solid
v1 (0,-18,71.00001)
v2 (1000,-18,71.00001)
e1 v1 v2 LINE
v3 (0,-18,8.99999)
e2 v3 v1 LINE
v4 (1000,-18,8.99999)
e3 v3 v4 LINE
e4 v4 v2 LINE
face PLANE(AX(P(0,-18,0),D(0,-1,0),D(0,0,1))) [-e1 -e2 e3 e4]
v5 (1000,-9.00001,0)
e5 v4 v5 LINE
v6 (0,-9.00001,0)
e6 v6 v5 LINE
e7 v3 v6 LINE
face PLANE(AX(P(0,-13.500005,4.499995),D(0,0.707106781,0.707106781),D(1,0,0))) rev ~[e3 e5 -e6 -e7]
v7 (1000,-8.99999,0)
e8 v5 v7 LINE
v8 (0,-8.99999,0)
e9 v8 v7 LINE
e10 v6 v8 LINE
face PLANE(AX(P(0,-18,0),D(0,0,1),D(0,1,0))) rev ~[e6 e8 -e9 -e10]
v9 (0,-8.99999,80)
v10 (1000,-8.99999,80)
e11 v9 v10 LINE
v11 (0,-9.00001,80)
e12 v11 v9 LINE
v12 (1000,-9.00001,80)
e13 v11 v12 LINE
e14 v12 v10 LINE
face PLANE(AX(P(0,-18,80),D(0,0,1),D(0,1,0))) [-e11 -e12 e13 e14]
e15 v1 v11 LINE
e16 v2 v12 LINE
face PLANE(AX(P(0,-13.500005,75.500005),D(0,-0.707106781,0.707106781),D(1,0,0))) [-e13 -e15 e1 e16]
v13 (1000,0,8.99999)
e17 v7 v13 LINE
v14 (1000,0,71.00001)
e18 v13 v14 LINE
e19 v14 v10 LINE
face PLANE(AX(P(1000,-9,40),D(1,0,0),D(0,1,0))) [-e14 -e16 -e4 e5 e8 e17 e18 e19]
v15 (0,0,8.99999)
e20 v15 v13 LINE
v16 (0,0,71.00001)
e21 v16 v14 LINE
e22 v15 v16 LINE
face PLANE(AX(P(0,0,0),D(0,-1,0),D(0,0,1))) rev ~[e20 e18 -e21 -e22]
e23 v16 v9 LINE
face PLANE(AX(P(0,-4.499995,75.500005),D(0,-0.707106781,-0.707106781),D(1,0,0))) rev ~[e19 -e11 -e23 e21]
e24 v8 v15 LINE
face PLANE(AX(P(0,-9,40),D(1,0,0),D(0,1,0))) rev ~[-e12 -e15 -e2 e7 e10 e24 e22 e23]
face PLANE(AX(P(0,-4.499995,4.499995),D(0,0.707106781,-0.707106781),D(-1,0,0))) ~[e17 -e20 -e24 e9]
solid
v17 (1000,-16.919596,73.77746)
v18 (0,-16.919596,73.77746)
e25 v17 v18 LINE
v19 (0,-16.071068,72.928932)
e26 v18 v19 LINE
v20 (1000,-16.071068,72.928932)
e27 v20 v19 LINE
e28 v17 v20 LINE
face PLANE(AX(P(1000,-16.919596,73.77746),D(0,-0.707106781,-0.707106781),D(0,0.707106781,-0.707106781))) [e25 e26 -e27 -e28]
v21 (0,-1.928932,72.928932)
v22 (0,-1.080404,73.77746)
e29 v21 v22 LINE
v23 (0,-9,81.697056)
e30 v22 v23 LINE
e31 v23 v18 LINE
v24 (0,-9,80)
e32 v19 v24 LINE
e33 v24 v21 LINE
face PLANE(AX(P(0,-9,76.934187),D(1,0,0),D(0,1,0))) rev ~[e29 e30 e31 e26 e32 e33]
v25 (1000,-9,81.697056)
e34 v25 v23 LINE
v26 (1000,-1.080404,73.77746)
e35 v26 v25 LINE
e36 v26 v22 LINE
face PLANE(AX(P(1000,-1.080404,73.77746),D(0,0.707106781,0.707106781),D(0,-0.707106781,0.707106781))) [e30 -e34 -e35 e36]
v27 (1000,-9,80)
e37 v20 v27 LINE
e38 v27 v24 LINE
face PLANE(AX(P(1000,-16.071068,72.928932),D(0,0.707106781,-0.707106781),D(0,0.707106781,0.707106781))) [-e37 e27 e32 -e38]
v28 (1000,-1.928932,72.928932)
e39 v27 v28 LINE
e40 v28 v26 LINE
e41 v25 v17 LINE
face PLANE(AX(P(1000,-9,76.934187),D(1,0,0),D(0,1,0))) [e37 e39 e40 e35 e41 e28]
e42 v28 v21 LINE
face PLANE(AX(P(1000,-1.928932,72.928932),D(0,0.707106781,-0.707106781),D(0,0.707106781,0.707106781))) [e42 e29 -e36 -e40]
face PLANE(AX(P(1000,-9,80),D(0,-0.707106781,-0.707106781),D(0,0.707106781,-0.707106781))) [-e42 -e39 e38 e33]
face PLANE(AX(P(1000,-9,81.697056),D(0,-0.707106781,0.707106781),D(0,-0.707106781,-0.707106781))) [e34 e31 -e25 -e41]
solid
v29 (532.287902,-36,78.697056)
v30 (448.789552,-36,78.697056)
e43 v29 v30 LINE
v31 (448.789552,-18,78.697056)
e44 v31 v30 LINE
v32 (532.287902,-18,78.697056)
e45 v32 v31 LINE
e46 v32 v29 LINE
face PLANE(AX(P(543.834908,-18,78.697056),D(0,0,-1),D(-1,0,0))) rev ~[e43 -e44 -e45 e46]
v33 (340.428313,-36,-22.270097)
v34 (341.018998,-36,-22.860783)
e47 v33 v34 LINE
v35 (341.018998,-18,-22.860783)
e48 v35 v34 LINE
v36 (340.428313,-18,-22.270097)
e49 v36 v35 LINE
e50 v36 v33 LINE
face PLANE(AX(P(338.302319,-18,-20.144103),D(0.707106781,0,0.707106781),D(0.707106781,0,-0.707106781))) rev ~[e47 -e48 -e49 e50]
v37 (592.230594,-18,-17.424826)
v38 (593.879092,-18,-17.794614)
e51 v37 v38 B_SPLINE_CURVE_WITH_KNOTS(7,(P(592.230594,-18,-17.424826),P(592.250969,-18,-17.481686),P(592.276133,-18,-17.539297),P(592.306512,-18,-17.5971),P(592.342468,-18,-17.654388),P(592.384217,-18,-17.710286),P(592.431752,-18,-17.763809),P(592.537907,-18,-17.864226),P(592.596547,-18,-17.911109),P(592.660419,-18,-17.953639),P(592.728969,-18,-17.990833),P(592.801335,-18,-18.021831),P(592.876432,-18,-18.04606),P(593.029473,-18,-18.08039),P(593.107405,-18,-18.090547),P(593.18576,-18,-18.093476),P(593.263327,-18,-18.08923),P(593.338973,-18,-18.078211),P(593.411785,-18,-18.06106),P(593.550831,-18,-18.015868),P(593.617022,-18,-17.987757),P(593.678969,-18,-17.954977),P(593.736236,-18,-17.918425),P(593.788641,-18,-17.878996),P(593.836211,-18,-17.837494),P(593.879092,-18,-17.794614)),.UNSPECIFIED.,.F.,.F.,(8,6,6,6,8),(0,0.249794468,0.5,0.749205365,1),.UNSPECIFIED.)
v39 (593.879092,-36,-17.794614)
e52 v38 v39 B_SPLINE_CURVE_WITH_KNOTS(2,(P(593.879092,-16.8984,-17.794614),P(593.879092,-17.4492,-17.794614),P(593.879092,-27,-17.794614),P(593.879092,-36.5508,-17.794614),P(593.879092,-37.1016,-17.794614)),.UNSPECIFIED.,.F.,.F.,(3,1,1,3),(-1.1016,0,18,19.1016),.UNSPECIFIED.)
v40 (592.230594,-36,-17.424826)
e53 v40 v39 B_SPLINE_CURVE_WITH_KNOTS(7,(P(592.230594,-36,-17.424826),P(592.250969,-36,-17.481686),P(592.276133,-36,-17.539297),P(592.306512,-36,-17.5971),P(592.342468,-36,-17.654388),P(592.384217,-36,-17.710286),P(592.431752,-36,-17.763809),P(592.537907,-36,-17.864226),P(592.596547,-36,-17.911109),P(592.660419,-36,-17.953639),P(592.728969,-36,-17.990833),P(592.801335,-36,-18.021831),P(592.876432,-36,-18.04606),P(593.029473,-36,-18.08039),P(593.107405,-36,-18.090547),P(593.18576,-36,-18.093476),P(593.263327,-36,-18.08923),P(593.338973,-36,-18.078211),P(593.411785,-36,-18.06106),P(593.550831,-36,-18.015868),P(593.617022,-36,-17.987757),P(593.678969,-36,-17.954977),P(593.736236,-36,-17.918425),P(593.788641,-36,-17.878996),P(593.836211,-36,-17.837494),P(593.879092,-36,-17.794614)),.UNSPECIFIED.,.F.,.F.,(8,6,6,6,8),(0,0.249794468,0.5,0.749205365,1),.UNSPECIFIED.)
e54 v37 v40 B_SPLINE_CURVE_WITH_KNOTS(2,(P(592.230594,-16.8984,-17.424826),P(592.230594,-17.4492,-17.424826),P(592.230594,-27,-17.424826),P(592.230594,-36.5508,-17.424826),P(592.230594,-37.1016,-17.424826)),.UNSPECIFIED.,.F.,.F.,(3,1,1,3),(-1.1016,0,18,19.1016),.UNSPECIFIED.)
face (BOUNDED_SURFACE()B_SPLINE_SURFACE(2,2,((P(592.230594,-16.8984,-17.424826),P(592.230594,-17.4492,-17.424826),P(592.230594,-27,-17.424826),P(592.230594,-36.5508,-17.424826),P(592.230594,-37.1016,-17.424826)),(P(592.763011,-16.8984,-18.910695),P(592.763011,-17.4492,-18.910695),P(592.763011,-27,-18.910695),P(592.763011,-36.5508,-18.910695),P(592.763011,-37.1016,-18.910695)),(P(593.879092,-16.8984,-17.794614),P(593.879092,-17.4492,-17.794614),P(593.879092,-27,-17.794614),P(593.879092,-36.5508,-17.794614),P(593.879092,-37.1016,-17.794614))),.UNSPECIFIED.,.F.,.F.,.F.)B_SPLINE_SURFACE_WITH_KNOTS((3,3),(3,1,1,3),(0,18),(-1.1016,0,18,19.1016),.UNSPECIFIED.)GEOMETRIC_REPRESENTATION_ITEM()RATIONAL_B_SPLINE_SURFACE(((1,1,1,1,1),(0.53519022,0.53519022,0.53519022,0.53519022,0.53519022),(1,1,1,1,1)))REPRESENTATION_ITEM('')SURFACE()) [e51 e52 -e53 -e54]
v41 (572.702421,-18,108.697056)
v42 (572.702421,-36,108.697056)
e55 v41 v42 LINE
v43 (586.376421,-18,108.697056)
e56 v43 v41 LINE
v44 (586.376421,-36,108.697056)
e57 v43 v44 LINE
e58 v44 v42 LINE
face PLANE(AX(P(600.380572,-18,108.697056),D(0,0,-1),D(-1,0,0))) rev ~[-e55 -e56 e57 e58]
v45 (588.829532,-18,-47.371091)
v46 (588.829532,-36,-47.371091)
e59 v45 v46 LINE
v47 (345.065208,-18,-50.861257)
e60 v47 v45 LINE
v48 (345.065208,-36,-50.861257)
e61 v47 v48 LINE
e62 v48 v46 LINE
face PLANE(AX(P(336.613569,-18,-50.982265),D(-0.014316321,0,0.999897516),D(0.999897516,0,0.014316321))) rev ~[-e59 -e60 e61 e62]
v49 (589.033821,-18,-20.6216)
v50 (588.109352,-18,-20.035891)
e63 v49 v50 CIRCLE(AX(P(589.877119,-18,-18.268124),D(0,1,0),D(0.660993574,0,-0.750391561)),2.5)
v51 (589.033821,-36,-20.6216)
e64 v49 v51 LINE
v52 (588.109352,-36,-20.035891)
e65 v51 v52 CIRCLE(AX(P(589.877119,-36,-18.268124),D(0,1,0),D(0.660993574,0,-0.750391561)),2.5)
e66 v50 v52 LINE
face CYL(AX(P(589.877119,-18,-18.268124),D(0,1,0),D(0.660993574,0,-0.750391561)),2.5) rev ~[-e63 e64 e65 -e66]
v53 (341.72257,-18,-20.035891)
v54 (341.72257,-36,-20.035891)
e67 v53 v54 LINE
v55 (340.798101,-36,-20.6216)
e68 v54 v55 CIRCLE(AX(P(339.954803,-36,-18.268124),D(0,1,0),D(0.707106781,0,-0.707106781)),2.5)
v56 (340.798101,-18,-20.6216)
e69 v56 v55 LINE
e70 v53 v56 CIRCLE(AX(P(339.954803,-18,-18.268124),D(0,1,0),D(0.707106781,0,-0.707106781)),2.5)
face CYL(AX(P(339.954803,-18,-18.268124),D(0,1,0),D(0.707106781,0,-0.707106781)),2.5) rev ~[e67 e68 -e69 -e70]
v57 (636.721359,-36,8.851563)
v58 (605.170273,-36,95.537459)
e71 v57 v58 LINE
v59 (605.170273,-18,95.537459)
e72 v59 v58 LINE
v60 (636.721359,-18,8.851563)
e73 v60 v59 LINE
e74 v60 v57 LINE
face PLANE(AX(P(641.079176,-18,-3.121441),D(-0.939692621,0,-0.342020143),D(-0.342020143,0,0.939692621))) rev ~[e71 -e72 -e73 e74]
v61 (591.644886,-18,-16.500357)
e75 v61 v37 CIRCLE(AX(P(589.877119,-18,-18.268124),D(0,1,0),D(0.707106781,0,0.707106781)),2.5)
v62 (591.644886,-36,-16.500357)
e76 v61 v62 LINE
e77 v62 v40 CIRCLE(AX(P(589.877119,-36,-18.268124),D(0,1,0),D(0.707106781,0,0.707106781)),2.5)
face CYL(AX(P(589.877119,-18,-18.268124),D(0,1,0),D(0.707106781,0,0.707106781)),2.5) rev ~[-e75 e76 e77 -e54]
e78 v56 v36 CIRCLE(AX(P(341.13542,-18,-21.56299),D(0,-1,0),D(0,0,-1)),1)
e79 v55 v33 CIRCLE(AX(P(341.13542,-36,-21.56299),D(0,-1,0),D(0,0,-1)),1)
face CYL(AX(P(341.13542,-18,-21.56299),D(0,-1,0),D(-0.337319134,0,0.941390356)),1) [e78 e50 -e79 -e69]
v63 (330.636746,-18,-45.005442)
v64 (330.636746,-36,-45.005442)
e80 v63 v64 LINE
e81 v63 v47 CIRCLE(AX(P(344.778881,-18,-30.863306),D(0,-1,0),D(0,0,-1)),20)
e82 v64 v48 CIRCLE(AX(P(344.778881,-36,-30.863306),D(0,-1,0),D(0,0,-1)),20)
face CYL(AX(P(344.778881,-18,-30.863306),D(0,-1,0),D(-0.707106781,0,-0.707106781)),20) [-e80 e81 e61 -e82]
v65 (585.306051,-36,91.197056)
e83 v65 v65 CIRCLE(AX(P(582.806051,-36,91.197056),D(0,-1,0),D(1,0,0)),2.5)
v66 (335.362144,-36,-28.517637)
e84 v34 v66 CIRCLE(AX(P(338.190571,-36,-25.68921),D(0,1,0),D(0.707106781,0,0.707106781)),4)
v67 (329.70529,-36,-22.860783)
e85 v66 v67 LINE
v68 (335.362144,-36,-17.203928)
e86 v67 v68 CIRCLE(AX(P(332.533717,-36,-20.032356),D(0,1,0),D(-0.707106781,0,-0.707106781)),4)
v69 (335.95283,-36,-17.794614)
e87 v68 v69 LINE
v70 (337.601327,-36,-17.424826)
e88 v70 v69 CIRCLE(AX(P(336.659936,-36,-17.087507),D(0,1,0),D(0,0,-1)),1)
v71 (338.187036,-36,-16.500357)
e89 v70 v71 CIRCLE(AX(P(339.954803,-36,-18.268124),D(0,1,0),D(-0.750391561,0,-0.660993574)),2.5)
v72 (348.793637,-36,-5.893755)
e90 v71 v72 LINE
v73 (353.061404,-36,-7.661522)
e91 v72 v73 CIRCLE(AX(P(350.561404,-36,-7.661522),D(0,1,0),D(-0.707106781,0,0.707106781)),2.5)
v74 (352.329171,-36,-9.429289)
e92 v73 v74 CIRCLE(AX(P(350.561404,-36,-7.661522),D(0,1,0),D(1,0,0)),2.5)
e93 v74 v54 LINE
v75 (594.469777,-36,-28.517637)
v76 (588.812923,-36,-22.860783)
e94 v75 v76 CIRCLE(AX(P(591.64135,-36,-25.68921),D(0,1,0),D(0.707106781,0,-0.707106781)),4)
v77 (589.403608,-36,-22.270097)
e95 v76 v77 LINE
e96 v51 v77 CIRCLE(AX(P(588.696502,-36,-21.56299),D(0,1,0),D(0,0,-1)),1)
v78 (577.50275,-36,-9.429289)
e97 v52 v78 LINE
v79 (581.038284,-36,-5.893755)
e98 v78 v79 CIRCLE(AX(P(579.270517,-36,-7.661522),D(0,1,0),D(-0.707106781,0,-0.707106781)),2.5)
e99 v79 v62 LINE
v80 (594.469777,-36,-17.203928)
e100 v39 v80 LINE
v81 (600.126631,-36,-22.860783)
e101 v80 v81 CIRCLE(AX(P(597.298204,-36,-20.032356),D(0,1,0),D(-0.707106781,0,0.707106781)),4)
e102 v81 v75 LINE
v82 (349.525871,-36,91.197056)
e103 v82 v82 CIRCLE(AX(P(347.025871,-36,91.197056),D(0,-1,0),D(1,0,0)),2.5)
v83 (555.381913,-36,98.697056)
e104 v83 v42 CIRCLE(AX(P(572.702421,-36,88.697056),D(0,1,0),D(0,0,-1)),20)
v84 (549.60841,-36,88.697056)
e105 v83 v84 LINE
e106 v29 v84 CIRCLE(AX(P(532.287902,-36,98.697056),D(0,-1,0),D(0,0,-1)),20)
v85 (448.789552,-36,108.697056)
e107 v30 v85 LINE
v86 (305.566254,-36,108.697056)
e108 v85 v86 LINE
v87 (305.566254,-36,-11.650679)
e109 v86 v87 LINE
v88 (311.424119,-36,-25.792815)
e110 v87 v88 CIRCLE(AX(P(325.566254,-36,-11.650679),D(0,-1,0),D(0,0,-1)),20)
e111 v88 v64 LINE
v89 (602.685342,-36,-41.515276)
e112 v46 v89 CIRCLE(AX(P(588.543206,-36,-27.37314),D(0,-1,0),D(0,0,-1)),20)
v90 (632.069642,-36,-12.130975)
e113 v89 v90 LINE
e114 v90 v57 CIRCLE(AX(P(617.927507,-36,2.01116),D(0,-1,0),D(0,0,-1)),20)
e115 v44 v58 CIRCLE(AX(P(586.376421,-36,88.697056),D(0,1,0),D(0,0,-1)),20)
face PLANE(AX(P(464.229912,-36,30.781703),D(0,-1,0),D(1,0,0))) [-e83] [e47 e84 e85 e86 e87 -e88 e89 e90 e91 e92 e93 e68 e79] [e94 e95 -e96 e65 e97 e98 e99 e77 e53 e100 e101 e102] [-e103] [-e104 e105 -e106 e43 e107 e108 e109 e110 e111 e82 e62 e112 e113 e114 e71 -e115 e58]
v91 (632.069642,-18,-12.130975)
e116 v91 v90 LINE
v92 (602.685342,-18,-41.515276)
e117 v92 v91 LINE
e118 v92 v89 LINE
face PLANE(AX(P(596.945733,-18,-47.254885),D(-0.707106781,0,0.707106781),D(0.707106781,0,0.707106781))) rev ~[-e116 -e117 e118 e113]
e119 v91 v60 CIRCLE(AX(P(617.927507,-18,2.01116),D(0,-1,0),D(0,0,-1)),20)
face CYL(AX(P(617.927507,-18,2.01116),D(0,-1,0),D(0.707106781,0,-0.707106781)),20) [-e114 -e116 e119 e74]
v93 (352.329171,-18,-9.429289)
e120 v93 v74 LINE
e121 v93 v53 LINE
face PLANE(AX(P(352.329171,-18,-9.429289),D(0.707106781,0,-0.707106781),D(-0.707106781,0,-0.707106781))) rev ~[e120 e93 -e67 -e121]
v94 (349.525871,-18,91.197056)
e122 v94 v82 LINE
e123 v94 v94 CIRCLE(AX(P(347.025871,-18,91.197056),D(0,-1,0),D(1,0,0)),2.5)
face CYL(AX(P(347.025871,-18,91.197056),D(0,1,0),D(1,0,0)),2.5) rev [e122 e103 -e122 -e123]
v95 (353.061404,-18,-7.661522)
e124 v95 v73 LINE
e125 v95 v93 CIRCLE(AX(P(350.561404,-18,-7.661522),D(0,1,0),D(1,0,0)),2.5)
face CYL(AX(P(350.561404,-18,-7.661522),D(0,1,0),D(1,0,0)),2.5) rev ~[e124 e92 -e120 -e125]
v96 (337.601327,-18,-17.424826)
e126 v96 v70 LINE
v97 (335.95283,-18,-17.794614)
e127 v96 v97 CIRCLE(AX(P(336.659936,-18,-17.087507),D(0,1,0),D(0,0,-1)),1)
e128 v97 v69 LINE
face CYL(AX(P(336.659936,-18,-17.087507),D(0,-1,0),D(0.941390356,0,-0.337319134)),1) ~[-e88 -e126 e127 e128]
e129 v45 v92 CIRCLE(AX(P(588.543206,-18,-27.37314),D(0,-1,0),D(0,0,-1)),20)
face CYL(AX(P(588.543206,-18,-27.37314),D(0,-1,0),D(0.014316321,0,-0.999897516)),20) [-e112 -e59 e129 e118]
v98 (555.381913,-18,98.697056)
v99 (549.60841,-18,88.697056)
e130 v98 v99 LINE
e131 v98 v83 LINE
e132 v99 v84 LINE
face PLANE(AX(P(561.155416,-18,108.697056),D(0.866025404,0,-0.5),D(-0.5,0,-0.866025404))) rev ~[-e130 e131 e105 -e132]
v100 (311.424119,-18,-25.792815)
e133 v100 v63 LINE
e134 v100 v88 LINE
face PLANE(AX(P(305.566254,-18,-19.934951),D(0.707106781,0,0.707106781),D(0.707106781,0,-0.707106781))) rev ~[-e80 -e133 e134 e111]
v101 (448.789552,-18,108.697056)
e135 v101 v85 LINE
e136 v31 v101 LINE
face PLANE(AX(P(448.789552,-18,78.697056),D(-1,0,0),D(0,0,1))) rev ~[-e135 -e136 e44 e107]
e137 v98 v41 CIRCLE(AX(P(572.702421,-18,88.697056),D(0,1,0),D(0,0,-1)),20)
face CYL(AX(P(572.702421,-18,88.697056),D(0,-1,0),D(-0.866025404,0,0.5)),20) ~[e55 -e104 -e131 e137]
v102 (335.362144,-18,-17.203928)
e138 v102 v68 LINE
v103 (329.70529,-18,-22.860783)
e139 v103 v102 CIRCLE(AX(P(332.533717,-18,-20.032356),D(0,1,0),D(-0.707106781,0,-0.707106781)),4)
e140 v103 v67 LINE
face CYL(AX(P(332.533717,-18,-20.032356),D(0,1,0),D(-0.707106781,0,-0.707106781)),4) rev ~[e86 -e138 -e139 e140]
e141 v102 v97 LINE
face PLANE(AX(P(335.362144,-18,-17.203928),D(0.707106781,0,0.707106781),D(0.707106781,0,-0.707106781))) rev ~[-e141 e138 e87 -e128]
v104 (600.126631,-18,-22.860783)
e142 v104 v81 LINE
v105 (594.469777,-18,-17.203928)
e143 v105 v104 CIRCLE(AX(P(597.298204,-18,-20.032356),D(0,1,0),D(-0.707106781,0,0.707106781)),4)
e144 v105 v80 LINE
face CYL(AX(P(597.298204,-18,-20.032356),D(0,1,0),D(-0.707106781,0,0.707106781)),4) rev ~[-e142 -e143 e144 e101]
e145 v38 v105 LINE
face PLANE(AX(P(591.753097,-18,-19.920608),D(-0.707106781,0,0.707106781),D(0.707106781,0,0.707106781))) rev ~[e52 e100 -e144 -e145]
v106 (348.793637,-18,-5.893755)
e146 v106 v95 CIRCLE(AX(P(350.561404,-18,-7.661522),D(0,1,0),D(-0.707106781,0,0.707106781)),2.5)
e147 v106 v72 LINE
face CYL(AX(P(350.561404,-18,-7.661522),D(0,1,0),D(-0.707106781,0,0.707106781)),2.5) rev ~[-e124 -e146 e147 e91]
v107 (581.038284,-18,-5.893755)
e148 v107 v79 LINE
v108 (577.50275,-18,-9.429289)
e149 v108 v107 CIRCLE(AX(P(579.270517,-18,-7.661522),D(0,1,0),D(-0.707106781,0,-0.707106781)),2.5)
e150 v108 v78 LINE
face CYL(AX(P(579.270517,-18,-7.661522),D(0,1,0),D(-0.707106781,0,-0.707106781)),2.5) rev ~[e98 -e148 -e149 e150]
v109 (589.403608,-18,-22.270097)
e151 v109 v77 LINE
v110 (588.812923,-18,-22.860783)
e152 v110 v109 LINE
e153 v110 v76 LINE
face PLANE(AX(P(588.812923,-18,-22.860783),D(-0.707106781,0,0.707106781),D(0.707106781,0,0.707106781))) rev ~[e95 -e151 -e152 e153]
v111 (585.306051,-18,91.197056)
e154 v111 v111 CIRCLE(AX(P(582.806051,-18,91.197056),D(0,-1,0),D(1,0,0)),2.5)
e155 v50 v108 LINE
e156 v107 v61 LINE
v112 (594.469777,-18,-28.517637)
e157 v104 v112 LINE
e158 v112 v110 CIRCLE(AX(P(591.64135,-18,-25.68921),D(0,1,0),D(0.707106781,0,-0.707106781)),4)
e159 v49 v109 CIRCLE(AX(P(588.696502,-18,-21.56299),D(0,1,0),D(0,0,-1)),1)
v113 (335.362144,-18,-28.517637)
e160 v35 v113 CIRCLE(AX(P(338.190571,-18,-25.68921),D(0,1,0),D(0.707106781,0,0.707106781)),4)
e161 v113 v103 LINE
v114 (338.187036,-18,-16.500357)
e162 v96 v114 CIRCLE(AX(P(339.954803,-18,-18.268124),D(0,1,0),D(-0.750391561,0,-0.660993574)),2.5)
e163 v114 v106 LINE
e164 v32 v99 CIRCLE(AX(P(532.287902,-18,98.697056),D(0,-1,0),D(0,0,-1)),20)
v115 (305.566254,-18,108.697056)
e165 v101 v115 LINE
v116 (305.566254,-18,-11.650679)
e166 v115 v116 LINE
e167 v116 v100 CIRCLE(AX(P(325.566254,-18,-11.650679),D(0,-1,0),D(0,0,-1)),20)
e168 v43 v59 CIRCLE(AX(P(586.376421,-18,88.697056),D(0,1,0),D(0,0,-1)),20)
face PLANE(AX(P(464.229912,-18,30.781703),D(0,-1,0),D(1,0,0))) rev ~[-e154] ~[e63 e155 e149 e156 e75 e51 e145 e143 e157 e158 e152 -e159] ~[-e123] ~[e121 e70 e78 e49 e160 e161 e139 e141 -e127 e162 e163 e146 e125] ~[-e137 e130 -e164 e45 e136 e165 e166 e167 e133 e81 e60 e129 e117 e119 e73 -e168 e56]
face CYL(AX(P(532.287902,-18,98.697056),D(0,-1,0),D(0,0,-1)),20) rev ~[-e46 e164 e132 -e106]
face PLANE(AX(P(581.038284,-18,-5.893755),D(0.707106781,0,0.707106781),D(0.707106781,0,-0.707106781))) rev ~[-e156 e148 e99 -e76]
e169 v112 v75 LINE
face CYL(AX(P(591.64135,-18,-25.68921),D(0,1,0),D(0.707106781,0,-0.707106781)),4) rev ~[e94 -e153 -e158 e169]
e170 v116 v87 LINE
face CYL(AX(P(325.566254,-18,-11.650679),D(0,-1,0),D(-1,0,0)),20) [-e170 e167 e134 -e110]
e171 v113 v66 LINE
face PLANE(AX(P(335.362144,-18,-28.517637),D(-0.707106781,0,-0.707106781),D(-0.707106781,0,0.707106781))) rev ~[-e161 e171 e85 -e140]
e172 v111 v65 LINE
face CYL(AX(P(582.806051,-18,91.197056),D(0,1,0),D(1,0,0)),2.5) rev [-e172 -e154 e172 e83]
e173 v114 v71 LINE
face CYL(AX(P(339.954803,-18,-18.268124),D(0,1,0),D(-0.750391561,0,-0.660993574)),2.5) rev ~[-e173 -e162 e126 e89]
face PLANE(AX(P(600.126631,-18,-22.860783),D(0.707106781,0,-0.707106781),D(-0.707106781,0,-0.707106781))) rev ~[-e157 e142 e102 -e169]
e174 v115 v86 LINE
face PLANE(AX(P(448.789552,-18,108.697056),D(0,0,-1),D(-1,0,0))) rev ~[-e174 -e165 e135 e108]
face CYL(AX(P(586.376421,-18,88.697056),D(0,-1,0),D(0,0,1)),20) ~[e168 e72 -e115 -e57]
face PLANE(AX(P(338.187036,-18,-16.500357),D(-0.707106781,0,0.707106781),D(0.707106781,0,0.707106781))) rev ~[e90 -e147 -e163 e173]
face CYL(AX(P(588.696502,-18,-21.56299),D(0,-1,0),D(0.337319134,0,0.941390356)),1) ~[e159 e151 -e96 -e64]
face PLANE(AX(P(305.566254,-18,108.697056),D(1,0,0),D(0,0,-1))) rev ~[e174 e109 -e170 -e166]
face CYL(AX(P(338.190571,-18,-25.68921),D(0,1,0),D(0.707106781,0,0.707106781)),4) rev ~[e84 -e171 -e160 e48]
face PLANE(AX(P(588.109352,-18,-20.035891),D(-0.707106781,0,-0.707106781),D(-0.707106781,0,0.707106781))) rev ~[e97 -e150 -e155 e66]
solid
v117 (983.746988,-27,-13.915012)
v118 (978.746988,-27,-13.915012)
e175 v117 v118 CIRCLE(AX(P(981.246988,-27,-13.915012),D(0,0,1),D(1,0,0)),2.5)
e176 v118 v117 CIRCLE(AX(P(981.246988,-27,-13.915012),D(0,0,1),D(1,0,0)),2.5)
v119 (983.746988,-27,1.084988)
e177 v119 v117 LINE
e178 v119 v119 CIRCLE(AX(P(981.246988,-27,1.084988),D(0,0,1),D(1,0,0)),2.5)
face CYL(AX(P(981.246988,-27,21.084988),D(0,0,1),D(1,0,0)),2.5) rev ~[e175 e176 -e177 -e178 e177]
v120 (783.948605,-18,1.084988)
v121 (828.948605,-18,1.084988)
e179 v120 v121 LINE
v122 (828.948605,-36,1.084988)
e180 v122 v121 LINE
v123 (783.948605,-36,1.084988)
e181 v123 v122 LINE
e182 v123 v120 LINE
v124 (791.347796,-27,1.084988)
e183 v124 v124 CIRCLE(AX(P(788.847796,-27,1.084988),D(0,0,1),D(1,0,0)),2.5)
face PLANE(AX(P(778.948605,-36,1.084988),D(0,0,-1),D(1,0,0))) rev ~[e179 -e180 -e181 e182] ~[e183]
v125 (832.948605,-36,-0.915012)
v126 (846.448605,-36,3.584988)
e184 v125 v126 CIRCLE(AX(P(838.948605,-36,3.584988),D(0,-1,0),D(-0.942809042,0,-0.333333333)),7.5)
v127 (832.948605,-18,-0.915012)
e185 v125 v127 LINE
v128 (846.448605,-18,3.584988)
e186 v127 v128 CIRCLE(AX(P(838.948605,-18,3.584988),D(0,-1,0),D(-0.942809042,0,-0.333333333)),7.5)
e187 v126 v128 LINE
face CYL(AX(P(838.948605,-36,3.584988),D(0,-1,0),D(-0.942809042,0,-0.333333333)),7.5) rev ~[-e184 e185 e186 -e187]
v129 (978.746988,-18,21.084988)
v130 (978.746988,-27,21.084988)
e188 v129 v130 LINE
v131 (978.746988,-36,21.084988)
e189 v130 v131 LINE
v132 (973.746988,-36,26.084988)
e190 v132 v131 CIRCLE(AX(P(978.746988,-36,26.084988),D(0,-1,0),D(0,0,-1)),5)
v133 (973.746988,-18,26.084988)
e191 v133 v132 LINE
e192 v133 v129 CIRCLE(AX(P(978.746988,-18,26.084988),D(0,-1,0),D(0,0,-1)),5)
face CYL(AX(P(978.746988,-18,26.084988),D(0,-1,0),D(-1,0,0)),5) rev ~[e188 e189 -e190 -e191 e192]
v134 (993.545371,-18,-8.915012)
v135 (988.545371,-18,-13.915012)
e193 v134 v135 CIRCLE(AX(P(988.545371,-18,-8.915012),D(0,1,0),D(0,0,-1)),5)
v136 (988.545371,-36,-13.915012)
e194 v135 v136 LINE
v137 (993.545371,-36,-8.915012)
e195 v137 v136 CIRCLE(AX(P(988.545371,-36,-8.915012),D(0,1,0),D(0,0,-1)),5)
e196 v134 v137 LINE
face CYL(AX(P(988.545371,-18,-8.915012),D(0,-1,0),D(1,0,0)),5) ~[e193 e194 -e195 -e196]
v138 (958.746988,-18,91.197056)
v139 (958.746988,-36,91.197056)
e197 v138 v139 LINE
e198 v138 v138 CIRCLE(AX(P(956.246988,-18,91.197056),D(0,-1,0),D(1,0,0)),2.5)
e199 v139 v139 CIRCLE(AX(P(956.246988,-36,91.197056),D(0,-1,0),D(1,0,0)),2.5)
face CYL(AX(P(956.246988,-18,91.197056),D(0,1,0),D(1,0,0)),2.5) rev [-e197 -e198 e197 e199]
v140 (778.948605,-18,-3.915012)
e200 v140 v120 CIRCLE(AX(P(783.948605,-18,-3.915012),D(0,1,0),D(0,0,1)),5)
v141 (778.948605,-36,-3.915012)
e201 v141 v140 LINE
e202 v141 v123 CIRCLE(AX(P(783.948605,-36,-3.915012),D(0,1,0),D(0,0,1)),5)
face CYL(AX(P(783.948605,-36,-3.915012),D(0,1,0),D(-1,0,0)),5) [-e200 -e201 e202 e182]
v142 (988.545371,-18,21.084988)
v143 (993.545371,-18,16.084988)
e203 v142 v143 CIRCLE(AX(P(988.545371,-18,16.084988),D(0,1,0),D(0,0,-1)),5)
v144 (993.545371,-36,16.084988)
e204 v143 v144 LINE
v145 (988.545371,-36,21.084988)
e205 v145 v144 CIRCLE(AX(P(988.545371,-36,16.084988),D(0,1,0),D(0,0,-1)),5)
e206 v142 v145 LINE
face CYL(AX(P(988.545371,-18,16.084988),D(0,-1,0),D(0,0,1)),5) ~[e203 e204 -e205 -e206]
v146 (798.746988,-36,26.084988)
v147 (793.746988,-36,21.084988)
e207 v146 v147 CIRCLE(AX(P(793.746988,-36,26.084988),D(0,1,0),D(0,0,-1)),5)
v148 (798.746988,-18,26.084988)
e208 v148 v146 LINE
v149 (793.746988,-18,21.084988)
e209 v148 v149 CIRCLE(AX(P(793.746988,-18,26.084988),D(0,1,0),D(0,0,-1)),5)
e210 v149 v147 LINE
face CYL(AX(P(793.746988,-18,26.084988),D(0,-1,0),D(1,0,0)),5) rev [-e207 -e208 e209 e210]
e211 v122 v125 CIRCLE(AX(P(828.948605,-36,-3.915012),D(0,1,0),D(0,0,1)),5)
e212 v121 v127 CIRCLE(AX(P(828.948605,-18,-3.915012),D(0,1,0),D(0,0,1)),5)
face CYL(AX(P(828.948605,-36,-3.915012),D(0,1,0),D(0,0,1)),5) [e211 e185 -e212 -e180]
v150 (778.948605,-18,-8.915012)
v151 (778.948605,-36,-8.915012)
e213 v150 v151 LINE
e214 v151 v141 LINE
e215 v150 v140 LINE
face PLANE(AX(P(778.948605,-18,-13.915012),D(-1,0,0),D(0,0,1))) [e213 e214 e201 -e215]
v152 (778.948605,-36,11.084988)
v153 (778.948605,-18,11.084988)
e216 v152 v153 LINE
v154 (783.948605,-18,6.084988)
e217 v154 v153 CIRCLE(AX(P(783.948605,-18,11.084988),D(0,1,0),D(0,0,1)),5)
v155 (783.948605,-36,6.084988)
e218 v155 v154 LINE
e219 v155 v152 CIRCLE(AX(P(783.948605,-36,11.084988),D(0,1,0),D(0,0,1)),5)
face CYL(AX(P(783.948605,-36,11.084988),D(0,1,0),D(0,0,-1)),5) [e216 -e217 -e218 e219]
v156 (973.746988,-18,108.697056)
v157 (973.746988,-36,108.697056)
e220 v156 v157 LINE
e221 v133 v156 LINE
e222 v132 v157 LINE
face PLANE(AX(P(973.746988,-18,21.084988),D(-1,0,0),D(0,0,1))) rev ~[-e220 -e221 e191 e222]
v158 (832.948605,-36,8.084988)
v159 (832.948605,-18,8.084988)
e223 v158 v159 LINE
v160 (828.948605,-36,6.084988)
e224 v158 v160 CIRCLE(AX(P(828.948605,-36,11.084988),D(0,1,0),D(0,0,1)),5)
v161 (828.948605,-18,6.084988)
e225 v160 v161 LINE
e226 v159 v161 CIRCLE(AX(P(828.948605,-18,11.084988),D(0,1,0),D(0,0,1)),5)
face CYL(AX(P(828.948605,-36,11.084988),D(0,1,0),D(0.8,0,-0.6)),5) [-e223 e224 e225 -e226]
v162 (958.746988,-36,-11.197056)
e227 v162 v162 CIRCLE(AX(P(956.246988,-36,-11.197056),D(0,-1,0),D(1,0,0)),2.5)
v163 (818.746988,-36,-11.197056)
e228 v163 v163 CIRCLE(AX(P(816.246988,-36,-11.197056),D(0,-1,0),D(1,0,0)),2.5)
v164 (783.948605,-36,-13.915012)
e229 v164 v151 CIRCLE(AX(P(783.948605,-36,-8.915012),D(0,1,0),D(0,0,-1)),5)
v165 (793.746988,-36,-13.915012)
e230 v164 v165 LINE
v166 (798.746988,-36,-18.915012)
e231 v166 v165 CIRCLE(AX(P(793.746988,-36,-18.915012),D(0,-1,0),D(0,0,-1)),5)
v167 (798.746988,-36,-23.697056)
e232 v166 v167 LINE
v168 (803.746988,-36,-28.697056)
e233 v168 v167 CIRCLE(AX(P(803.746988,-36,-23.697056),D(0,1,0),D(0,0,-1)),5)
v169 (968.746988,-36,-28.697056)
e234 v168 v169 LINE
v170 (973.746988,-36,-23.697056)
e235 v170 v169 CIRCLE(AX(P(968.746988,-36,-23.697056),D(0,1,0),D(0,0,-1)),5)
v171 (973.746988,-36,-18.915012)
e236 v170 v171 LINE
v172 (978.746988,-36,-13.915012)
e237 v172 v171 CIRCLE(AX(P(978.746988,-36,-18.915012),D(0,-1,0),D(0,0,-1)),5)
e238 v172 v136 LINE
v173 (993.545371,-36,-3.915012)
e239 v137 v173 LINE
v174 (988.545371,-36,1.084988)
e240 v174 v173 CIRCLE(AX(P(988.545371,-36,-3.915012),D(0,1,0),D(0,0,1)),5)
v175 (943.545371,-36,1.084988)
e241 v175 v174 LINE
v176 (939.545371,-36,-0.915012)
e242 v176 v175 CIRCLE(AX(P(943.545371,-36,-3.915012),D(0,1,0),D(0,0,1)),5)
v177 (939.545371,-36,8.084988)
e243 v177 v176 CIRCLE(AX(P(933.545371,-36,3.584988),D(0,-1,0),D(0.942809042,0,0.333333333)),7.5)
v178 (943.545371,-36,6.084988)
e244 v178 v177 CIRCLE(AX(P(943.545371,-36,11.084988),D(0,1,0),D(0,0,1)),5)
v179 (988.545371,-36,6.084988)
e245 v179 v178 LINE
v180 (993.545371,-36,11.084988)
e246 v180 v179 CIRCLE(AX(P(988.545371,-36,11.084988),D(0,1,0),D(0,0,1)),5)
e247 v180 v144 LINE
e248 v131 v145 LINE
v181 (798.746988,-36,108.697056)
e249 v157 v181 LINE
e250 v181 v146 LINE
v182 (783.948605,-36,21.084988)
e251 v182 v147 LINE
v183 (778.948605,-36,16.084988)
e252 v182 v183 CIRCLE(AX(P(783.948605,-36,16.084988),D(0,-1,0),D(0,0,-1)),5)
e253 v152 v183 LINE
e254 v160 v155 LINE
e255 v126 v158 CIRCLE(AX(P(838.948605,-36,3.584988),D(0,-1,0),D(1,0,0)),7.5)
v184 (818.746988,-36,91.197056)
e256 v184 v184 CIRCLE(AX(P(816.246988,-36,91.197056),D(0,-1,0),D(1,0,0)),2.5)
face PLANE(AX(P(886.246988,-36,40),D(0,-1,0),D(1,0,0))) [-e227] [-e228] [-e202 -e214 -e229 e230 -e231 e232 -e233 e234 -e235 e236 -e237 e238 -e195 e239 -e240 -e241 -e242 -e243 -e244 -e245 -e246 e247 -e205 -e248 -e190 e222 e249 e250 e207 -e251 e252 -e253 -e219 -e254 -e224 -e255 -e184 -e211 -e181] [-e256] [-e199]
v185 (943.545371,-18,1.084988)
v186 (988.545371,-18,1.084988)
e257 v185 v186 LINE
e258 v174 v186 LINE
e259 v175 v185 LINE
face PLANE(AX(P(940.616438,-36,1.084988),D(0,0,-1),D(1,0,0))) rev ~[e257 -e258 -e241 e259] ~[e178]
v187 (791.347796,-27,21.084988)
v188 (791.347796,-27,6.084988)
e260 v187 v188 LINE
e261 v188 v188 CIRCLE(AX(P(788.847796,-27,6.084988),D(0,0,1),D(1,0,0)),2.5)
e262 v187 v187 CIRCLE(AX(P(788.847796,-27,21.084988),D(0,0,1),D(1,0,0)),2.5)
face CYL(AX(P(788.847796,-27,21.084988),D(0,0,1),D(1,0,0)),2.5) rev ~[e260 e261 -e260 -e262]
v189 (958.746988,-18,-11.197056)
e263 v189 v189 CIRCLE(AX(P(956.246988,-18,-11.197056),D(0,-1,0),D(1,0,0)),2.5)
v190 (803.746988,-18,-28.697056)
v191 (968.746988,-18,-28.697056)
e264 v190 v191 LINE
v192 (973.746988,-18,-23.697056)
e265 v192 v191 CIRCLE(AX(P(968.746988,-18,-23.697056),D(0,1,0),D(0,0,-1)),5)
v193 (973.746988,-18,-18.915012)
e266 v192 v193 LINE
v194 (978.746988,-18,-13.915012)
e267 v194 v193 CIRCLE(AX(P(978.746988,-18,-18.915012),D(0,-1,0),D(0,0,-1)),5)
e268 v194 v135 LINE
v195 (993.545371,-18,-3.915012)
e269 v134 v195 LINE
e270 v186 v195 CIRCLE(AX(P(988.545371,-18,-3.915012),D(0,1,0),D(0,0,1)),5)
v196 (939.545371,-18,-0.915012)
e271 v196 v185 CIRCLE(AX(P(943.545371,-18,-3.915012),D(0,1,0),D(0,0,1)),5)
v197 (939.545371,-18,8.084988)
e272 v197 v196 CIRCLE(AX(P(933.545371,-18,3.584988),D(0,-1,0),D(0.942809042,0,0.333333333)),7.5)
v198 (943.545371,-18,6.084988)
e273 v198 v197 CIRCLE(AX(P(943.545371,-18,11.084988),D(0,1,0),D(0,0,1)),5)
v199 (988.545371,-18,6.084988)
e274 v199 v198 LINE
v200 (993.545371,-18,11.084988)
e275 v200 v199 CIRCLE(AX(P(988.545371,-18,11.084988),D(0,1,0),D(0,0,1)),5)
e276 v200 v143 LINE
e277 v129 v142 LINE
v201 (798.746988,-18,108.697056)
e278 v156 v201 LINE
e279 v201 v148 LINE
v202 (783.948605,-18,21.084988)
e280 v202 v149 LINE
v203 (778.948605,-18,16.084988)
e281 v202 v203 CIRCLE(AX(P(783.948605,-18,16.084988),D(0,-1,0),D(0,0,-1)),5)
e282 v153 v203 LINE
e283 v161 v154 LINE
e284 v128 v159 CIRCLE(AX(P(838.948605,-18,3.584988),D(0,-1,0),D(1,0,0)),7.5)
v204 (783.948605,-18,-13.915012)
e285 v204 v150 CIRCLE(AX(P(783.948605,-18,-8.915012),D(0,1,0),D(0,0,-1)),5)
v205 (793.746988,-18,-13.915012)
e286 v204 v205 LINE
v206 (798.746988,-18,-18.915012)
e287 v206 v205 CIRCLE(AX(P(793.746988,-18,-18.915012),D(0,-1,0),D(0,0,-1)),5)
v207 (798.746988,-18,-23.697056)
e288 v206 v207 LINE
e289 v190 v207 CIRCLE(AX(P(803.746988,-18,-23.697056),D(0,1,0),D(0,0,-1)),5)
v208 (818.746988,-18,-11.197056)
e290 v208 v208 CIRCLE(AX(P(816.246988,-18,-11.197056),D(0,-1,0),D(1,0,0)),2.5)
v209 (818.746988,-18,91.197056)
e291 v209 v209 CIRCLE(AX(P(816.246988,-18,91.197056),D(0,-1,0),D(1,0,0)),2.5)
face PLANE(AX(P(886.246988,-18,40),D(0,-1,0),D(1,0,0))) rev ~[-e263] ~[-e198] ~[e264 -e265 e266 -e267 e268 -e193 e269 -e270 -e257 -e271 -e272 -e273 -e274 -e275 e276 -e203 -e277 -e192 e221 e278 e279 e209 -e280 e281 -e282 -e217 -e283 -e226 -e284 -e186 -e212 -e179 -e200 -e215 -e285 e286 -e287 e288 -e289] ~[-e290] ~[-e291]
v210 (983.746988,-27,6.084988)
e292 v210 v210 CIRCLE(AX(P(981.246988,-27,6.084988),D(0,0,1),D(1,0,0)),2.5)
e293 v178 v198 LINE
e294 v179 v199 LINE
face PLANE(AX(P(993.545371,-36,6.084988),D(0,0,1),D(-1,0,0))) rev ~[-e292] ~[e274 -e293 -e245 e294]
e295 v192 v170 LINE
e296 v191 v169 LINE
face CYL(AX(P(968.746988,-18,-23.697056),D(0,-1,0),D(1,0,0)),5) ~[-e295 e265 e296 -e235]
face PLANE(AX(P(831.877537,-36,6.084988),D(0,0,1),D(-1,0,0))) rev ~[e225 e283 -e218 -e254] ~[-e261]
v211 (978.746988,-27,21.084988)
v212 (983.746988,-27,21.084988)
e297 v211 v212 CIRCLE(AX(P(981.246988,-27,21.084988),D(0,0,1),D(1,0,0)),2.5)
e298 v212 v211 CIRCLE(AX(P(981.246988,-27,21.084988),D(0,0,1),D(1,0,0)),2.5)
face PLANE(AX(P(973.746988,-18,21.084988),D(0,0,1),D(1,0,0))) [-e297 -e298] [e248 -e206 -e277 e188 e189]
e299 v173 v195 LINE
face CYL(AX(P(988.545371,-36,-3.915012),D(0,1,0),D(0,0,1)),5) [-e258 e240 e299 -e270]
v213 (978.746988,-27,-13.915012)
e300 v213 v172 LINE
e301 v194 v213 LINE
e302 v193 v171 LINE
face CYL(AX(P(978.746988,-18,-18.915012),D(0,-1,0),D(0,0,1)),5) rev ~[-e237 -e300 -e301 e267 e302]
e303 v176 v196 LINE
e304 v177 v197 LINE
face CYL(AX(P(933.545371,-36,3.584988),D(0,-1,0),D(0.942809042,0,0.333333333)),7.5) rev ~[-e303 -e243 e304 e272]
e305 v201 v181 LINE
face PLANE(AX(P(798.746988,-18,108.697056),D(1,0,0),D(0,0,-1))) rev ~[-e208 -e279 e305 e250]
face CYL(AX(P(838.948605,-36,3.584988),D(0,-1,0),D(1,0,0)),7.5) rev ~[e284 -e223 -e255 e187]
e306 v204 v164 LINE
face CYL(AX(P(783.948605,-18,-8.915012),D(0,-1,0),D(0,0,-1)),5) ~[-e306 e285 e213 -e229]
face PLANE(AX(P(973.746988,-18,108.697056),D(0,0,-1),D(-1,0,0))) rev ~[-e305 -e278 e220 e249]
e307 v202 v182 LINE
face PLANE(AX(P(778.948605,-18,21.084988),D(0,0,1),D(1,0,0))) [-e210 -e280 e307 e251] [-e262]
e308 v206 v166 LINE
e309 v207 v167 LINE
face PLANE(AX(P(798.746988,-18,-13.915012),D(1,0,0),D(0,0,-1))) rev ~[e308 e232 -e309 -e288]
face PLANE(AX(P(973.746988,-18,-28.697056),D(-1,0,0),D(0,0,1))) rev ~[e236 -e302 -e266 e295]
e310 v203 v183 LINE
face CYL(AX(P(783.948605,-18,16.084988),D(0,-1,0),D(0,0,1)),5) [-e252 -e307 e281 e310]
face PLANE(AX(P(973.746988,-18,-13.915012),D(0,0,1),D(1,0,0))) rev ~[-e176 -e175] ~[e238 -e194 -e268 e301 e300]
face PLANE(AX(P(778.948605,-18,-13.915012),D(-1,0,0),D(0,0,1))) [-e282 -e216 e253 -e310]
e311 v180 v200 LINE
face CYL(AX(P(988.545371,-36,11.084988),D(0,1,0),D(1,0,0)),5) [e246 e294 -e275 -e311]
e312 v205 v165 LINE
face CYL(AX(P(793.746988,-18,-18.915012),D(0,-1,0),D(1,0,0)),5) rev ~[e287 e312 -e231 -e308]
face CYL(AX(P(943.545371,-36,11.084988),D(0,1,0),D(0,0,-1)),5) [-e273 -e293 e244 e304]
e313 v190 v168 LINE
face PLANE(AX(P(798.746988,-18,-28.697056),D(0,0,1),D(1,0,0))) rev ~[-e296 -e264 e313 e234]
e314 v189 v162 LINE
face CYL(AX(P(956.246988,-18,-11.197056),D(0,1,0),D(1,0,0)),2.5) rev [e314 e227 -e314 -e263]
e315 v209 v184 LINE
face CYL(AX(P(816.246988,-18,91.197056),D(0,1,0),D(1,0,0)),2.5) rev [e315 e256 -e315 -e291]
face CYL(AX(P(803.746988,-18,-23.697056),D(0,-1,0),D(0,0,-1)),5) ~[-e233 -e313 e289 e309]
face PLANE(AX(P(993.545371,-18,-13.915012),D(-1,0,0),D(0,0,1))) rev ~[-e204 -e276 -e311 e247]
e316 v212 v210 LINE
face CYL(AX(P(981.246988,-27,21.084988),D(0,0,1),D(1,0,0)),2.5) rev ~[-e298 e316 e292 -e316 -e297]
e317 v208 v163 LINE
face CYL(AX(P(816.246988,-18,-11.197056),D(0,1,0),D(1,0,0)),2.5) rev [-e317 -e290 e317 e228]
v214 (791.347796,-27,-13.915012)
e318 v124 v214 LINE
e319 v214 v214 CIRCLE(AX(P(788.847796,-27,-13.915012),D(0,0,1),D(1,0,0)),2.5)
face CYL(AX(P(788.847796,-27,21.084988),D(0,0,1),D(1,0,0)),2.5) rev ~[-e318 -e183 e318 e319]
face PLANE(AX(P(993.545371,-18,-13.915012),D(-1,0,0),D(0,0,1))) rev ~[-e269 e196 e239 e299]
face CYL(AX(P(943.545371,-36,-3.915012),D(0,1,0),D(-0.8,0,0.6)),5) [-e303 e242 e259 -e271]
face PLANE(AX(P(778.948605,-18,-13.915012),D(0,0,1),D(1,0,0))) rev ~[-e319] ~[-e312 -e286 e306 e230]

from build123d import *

# Parameters (mm, degrees)
F1_W      = 18
F1_H      = 80
F2_DEPTH  = 1000
F3_SIZE   = 8.99999
F5_DEPTH  = 1000
F6_R      = 2.5
F6_W      = 19.7983827577
F6_H      = 35
F7_DEPTH  = 18
F9_DEPTH  = 25
F10_R     = 5
F11_R     = 2.5
F12_DEPTH = 49.7830446156
F13_R     = 2.5
F14_DEPTH = 18
F15_R     = 20
F16_R     = 1


# Not quite as in the source:
# - a fillet or chamfer is up to 0.001 mm smaller than in the source, because OpenCascade refuses the exact size


with BuildPart() as f2:
    # F1 (on Right) → F2 (new body)
    with BuildSketch(Plane.YZ):
        with Locations((-9, 40)):
            Rectangle(F1_W, F1_H)
    extrude(amount=F2_DEPTH)

    # F3 (size 9 in the source; OpenCascade refuses exactly that, so slightly less here)
    f3_edges = [f2.edges().sort_by_distance(p)[0] for p in [
        (500, -18, 80),
        (500, 0, 80),
        (500, 0, 0),
        (500, -18, 0),
    ]]
    chamfer(f3_edges, length=F3_SIZE)


with BuildPart() as f5:
    # F4 (on face) → F5 (new body)
    with BuildSketch(Plane.YZ.offset(1000)):
        Polygon((-16.9195959493, 73.7774603256), (-16.0710678119, 72.9289321881), (-9, 80), (-1.9289321881, 72.9289321881), (-1.0804040507, 73.7774603256), (-9, 81.6970562748), align=None)
    extrude(amount=-F5_DEPTH)


with BuildPart() as f7:
    # F6 (on face) → F7 (new body)
    with BuildSketch(Plane.XZ.offset(18)):
        Polygon((973.7469878183, 108.6970562748), (798.7469878183, 108.6970562748), (798.7469878183, 21.0849883407), (798.7469878183, -13.9150116593), (798.7469878183, -28.6970562748), (973.7469878183, -28.6970562748), (973.7469878183, -13.9150116593), (973.7469878183, 21.0849883407), align=None)
        with Locations((816.2469878183, -11.1970562748)):
            Circle(F6_R, mode=Mode.SUBTRACT)
        with Locations((956.2469878183, -11.1970562748)):
            Circle(F6_R, mode=Mode.SUBTRACT)
        with Locations((816.2469878183, 91.1970562748)):
            Circle(F6_R, mode=Mode.SUBTRACT)
        with Locations((956.2469878183, 91.1970562748)):
            Circle(F6_R, mode=Mode.SUBTRACT)
        with Locations((788.8477964394, 3.5849883407)):
            Rectangle(F6_W, F6_H)
        with Locations((983.6461791972, 3.5849883407)):
            Rectangle(F6_W, F6_H)
    extrude(amount=F7_DEPTH)

    # F8 (on face) → F9 (cut)
    with BuildSketch(Plane.XZ.offset(36)):
        with BuildLine():
            Line((831.8775372487, 6.0849883407), (778.9486050606, 6.0849883407))
            Line((778.9486050606, 6.0849883407), (778.9486050606, 1.0849883407))
            Line((778.9486050606, 1.0849883407), (831.8775372487, 1.0849883407))
            ThreePointArc((831.8775372487, 1.0849883407), (831.4486050606, 3.5849883407), (831.8775372487, 6.0849883407))
        make_face()
        with BuildLine():
            ThreePointArc((846.4486050606, 3.5849883407), (840.216869901, 10.9769775381), (831.8775372487, 6.0849883407))
            Line((831.8775372487, 6.0849883407), (838.9486050606, 6.0849883407))
            Line((838.9486050606, 6.0849883407), (838.9486050606, 1.0849883407))
            Line((838.9486050606, 1.0849883407), (831.8775372487, 1.0849883407))
            ThreePointArc((831.8775372487, 1.0849883407), (840.216869901, -3.8070008567), (846.4486050606, 3.5849883407))
        make_face()
        with BuildLine():
            Line((838.9486050606, 6.0849883407), (831.8775372487, 6.0849883407))
            ThreePointArc((831.8775372487, 6.0849883407), (831.4486050606, 3.5849883407), (831.8775372487, 1.0849883407))
            Line((831.8775372487, 1.0849883407), (838.9486050606, 1.0849883407))
            Line((838.9486050606, 1.0849883407), (838.9486050606, 6.0849883407))
        make_face()
        with BuildLine():
            Line((940.6164383879, 6.0849883407), (933.5453705761, 6.0849883407))
            Line((933.5453705761, 6.0849883407), (933.5453705761, 1.0849883407))
            Line((933.5453705761, 1.0849883407), (940.6164383879, 1.0849883407))
            ThreePointArc((940.6164383879, 1.0849883407), (940.9373597735, 2.3167235003), (941.0453705761, 3.5849883407))
            ThreePointArc((941.0453705761, 3.5849883407), (940.9373597735, 4.8532531812), (940.6164383879, 6.0849883407))
        make_face()
        with BuildLine():
            Line((933.5453705761, 1.0849883407), (933.5453705761, 6.0849883407))
            Line((933.5453705761, 6.0849883407), (940.6164383879, 6.0849883407))
            ThreePointArc((940.6164383879, 6.0849883407), (926.0453705761, 3.5849883407), (940.6164383879, 1.0849883407))
            Line((940.6164383879, 1.0849883407), (933.5453705761, 1.0849883407))
        make_face()
        with BuildLine():
            Line((993.5453705761, 6.0849883407), (940.6164383879, 6.0849883407))
            ThreePointArc((940.6164383879, 6.0849883407), (940.9373597735, 4.8532531812), (941.0453705761, 3.5849883407))
            ThreePointArc((941.0453705761, 3.5849883407), (940.9373597735, 2.3167235003), (940.6164383879, 1.0849883407))
            Line((940.6164383879, 1.0849883407), (993.5453705761, 1.0849883407))
            Line((993.5453705761, 1.0849883407), (993.5453705761, 6.0849883407))
        make_face()
    extrude(amount=-F9_DEPTH, mode=Mode.SUBTRACT)

    # F10
    f10_edges = [f7.edges().sort_by_distance(p)[0] for p in [
        (778.948605, -27, 21.084988),
        (798.746988, -27, 21.084988),
        (778.948605, -27, 6.084988),
        (778.948605, -27, 1.084988),
        (831.877537, -27, 1.084988),
        (831.877537, -27, 6.084988),
        (940.616438, -27, 6.084988),
        (993.545371, -27, 6.084988),
        (993.545371, -27, 21.084988),
        (993.545371, -27, 1.084988),
        (973.746988, -27, 21.084988),
        (940.616438, -27, 1.084988),
        (798.746988, -27, -13.915012),
        (798.746988, -27, -28.697056),
        (973.746988, -27, -28.697056),
        (973.746988, -27, -13.915012),
        (993.545371, -27, -13.915012),
        (778.948605, -27, -13.915012),
    ]]
    fillet(f10_edges, radius=F10_R)

    # F11 (on face) → F12 (cut, through all)
    with BuildSketch(Plane.XY.offset(21.0849883407)):
        with Locations((788.8477964394, -27)):
            Circle(F11_R)
        with Locations((981.2469878183, -27)):
            Circle(F11_R)
    extrude(amount=-F12_DEPTH, mode=Mode.SUBTRACT)


with BuildPart() as f14:
    # F13 (on face) → F14 (new body)
    with BuildSketch(Plane.XZ.offset(18)):
        Polygon((448.7895516693, 108.6970562748), (305.5662543474, 108.6970562748), (305.5662543474, -19.9349505144), (336.6135691666, -50.9822653337), (596.9457328866, -47.2548845621), (641.0791762714, -3.1214411773), (600.3805715585, 108.6970562748), (561.1554156828, 108.6970562748), (543.8349076071, 78.6970562748), (448.7895516693, 78.6970562748), align=None)
        with BuildLine():
            Line((338.3023187565, -20.144102989), (341.018998398, -22.8607826305))
            ThreePointArc((341.018998398, -22.8607826305), (341.018998398, -28.51763688), (335.3621441485, -28.51763688))
            Line((335.3621441485, -28.51763688), (329.705289899, -22.8607826305))
            ThreePointArc((329.705289899, -22.8607826305), (329.705289899, -17.203928381), (335.3621441485, -17.203928381))
            Line((335.3621441485, -17.203928381), (338.0788237901, -19.9206080226))
            ThreePointArc((338.0788237901, -19.9206080226), (337.456053005, -18.1890671452), (338.1870357394, -16.5003571337))
            Line((338.1870357394, -16.5003571337), (348.7936374572, -5.8937554159))
            ThreePointArc((348.7936374572, -5.8937554159), (351.518112991, -5.3518235376), (353.0614044101, -7.6615223689))
            ThreePointArc((353.0614044101, -7.6615223689), (352.8711032414, -8.6182309498), (352.3291713631, -9.4292893219))
            Line((352.3291713631, -9.4292893219), (341.7225696453, -20.0358910397))
            ThreePointArc((341.7225696453, -20.0358910397), (340.0338596338, -20.7668737741), (338.3023187565, -20.144102989))
        make_face(mode=Mode.SUBTRACT)
        with BuildLine():
            ThreePointArc((591.6448855423, -16.5003571337), (592.1868174206, -17.3114155058), (592.3771185893, -18.2681240867))
            ThreePointArc((592.3771185893, -18.2681240867), (592.215916064, -19.1513151035), (591.7530974916, -19.9206080226))
            Line((591.7530974916, -19.9206080226), (594.4697771331, -17.203928381))
            ThreePointArc((594.4697771331, -17.203928381), (600.1266313826, -17.203928381), (600.1266313826, -22.8607826305))
            Line((600.1266313826, -22.8607826305), (594.4697771331, -28.51763688))
            ThreePointArc((594.4697771331, -28.51763688), (588.8129228836, -28.51763688), (588.8129228836, -22.8607826305))
            Line((588.8129228836, -22.8607826305), (591.5296025252, -20.144102989))
            ThreePointArc((591.5296025252, -20.144102989), (589.7980616478, -20.7668737741), (588.1093516363, -20.0358910397))
            Line((588.1093516363, -20.0358910397), (577.5027499185, -9.4292893219))
            ThreePointArc((577.5027499185, -9.4292893219), (577.5027499185, -5.8937554159), (581.0382838245, -5.8937554159))
            Line((581.0382838245, -5.8937554159), (591.6448855423, -16.5003571337))
        make_face(mode=Mode.SUBTRACT)
        with Locations((347.0258705042, 91.1970562748)):
            Circle(F13_R, mode=Mode.SUBTRACT)
        with Locations((582.8060507774, 91.1970562748)):
            Circle(F13_R, mode=Mode.SUBTRACT)
    extrude(amount=F14_DEPTH)

    # F15
    f15_edges = [f14.edges().sort_by_distance(p)[0] for p in [
        (561.155416, -27, 108.697056),
        (600.380572, -27, 108.697056),
        (543.834908, -27, 78.697056),
        (596.945733, -27, -47.254885),
        (336.613569, -27, -50.982265),
        (305.566254, -27, -19.934951),
        (641.079176, -27, -3.121441),
    ]]
    fillet(f15_edges, radius=F15_R)

    # F16
    f16_edges = [f14.edges().sort_by_distance(p)[0] for p in [
        (338.302319, -27, -20.144103),
        (338.078824, -27, -19.920608),
        (591.753097, -27, -19.920608),
        (591.529603, -27, -20.144103),
    ]]
    fillet(f16_edges, radius=F16_R)


solid = Compound([f2.part, f5.part, f7.part, f14.part])
